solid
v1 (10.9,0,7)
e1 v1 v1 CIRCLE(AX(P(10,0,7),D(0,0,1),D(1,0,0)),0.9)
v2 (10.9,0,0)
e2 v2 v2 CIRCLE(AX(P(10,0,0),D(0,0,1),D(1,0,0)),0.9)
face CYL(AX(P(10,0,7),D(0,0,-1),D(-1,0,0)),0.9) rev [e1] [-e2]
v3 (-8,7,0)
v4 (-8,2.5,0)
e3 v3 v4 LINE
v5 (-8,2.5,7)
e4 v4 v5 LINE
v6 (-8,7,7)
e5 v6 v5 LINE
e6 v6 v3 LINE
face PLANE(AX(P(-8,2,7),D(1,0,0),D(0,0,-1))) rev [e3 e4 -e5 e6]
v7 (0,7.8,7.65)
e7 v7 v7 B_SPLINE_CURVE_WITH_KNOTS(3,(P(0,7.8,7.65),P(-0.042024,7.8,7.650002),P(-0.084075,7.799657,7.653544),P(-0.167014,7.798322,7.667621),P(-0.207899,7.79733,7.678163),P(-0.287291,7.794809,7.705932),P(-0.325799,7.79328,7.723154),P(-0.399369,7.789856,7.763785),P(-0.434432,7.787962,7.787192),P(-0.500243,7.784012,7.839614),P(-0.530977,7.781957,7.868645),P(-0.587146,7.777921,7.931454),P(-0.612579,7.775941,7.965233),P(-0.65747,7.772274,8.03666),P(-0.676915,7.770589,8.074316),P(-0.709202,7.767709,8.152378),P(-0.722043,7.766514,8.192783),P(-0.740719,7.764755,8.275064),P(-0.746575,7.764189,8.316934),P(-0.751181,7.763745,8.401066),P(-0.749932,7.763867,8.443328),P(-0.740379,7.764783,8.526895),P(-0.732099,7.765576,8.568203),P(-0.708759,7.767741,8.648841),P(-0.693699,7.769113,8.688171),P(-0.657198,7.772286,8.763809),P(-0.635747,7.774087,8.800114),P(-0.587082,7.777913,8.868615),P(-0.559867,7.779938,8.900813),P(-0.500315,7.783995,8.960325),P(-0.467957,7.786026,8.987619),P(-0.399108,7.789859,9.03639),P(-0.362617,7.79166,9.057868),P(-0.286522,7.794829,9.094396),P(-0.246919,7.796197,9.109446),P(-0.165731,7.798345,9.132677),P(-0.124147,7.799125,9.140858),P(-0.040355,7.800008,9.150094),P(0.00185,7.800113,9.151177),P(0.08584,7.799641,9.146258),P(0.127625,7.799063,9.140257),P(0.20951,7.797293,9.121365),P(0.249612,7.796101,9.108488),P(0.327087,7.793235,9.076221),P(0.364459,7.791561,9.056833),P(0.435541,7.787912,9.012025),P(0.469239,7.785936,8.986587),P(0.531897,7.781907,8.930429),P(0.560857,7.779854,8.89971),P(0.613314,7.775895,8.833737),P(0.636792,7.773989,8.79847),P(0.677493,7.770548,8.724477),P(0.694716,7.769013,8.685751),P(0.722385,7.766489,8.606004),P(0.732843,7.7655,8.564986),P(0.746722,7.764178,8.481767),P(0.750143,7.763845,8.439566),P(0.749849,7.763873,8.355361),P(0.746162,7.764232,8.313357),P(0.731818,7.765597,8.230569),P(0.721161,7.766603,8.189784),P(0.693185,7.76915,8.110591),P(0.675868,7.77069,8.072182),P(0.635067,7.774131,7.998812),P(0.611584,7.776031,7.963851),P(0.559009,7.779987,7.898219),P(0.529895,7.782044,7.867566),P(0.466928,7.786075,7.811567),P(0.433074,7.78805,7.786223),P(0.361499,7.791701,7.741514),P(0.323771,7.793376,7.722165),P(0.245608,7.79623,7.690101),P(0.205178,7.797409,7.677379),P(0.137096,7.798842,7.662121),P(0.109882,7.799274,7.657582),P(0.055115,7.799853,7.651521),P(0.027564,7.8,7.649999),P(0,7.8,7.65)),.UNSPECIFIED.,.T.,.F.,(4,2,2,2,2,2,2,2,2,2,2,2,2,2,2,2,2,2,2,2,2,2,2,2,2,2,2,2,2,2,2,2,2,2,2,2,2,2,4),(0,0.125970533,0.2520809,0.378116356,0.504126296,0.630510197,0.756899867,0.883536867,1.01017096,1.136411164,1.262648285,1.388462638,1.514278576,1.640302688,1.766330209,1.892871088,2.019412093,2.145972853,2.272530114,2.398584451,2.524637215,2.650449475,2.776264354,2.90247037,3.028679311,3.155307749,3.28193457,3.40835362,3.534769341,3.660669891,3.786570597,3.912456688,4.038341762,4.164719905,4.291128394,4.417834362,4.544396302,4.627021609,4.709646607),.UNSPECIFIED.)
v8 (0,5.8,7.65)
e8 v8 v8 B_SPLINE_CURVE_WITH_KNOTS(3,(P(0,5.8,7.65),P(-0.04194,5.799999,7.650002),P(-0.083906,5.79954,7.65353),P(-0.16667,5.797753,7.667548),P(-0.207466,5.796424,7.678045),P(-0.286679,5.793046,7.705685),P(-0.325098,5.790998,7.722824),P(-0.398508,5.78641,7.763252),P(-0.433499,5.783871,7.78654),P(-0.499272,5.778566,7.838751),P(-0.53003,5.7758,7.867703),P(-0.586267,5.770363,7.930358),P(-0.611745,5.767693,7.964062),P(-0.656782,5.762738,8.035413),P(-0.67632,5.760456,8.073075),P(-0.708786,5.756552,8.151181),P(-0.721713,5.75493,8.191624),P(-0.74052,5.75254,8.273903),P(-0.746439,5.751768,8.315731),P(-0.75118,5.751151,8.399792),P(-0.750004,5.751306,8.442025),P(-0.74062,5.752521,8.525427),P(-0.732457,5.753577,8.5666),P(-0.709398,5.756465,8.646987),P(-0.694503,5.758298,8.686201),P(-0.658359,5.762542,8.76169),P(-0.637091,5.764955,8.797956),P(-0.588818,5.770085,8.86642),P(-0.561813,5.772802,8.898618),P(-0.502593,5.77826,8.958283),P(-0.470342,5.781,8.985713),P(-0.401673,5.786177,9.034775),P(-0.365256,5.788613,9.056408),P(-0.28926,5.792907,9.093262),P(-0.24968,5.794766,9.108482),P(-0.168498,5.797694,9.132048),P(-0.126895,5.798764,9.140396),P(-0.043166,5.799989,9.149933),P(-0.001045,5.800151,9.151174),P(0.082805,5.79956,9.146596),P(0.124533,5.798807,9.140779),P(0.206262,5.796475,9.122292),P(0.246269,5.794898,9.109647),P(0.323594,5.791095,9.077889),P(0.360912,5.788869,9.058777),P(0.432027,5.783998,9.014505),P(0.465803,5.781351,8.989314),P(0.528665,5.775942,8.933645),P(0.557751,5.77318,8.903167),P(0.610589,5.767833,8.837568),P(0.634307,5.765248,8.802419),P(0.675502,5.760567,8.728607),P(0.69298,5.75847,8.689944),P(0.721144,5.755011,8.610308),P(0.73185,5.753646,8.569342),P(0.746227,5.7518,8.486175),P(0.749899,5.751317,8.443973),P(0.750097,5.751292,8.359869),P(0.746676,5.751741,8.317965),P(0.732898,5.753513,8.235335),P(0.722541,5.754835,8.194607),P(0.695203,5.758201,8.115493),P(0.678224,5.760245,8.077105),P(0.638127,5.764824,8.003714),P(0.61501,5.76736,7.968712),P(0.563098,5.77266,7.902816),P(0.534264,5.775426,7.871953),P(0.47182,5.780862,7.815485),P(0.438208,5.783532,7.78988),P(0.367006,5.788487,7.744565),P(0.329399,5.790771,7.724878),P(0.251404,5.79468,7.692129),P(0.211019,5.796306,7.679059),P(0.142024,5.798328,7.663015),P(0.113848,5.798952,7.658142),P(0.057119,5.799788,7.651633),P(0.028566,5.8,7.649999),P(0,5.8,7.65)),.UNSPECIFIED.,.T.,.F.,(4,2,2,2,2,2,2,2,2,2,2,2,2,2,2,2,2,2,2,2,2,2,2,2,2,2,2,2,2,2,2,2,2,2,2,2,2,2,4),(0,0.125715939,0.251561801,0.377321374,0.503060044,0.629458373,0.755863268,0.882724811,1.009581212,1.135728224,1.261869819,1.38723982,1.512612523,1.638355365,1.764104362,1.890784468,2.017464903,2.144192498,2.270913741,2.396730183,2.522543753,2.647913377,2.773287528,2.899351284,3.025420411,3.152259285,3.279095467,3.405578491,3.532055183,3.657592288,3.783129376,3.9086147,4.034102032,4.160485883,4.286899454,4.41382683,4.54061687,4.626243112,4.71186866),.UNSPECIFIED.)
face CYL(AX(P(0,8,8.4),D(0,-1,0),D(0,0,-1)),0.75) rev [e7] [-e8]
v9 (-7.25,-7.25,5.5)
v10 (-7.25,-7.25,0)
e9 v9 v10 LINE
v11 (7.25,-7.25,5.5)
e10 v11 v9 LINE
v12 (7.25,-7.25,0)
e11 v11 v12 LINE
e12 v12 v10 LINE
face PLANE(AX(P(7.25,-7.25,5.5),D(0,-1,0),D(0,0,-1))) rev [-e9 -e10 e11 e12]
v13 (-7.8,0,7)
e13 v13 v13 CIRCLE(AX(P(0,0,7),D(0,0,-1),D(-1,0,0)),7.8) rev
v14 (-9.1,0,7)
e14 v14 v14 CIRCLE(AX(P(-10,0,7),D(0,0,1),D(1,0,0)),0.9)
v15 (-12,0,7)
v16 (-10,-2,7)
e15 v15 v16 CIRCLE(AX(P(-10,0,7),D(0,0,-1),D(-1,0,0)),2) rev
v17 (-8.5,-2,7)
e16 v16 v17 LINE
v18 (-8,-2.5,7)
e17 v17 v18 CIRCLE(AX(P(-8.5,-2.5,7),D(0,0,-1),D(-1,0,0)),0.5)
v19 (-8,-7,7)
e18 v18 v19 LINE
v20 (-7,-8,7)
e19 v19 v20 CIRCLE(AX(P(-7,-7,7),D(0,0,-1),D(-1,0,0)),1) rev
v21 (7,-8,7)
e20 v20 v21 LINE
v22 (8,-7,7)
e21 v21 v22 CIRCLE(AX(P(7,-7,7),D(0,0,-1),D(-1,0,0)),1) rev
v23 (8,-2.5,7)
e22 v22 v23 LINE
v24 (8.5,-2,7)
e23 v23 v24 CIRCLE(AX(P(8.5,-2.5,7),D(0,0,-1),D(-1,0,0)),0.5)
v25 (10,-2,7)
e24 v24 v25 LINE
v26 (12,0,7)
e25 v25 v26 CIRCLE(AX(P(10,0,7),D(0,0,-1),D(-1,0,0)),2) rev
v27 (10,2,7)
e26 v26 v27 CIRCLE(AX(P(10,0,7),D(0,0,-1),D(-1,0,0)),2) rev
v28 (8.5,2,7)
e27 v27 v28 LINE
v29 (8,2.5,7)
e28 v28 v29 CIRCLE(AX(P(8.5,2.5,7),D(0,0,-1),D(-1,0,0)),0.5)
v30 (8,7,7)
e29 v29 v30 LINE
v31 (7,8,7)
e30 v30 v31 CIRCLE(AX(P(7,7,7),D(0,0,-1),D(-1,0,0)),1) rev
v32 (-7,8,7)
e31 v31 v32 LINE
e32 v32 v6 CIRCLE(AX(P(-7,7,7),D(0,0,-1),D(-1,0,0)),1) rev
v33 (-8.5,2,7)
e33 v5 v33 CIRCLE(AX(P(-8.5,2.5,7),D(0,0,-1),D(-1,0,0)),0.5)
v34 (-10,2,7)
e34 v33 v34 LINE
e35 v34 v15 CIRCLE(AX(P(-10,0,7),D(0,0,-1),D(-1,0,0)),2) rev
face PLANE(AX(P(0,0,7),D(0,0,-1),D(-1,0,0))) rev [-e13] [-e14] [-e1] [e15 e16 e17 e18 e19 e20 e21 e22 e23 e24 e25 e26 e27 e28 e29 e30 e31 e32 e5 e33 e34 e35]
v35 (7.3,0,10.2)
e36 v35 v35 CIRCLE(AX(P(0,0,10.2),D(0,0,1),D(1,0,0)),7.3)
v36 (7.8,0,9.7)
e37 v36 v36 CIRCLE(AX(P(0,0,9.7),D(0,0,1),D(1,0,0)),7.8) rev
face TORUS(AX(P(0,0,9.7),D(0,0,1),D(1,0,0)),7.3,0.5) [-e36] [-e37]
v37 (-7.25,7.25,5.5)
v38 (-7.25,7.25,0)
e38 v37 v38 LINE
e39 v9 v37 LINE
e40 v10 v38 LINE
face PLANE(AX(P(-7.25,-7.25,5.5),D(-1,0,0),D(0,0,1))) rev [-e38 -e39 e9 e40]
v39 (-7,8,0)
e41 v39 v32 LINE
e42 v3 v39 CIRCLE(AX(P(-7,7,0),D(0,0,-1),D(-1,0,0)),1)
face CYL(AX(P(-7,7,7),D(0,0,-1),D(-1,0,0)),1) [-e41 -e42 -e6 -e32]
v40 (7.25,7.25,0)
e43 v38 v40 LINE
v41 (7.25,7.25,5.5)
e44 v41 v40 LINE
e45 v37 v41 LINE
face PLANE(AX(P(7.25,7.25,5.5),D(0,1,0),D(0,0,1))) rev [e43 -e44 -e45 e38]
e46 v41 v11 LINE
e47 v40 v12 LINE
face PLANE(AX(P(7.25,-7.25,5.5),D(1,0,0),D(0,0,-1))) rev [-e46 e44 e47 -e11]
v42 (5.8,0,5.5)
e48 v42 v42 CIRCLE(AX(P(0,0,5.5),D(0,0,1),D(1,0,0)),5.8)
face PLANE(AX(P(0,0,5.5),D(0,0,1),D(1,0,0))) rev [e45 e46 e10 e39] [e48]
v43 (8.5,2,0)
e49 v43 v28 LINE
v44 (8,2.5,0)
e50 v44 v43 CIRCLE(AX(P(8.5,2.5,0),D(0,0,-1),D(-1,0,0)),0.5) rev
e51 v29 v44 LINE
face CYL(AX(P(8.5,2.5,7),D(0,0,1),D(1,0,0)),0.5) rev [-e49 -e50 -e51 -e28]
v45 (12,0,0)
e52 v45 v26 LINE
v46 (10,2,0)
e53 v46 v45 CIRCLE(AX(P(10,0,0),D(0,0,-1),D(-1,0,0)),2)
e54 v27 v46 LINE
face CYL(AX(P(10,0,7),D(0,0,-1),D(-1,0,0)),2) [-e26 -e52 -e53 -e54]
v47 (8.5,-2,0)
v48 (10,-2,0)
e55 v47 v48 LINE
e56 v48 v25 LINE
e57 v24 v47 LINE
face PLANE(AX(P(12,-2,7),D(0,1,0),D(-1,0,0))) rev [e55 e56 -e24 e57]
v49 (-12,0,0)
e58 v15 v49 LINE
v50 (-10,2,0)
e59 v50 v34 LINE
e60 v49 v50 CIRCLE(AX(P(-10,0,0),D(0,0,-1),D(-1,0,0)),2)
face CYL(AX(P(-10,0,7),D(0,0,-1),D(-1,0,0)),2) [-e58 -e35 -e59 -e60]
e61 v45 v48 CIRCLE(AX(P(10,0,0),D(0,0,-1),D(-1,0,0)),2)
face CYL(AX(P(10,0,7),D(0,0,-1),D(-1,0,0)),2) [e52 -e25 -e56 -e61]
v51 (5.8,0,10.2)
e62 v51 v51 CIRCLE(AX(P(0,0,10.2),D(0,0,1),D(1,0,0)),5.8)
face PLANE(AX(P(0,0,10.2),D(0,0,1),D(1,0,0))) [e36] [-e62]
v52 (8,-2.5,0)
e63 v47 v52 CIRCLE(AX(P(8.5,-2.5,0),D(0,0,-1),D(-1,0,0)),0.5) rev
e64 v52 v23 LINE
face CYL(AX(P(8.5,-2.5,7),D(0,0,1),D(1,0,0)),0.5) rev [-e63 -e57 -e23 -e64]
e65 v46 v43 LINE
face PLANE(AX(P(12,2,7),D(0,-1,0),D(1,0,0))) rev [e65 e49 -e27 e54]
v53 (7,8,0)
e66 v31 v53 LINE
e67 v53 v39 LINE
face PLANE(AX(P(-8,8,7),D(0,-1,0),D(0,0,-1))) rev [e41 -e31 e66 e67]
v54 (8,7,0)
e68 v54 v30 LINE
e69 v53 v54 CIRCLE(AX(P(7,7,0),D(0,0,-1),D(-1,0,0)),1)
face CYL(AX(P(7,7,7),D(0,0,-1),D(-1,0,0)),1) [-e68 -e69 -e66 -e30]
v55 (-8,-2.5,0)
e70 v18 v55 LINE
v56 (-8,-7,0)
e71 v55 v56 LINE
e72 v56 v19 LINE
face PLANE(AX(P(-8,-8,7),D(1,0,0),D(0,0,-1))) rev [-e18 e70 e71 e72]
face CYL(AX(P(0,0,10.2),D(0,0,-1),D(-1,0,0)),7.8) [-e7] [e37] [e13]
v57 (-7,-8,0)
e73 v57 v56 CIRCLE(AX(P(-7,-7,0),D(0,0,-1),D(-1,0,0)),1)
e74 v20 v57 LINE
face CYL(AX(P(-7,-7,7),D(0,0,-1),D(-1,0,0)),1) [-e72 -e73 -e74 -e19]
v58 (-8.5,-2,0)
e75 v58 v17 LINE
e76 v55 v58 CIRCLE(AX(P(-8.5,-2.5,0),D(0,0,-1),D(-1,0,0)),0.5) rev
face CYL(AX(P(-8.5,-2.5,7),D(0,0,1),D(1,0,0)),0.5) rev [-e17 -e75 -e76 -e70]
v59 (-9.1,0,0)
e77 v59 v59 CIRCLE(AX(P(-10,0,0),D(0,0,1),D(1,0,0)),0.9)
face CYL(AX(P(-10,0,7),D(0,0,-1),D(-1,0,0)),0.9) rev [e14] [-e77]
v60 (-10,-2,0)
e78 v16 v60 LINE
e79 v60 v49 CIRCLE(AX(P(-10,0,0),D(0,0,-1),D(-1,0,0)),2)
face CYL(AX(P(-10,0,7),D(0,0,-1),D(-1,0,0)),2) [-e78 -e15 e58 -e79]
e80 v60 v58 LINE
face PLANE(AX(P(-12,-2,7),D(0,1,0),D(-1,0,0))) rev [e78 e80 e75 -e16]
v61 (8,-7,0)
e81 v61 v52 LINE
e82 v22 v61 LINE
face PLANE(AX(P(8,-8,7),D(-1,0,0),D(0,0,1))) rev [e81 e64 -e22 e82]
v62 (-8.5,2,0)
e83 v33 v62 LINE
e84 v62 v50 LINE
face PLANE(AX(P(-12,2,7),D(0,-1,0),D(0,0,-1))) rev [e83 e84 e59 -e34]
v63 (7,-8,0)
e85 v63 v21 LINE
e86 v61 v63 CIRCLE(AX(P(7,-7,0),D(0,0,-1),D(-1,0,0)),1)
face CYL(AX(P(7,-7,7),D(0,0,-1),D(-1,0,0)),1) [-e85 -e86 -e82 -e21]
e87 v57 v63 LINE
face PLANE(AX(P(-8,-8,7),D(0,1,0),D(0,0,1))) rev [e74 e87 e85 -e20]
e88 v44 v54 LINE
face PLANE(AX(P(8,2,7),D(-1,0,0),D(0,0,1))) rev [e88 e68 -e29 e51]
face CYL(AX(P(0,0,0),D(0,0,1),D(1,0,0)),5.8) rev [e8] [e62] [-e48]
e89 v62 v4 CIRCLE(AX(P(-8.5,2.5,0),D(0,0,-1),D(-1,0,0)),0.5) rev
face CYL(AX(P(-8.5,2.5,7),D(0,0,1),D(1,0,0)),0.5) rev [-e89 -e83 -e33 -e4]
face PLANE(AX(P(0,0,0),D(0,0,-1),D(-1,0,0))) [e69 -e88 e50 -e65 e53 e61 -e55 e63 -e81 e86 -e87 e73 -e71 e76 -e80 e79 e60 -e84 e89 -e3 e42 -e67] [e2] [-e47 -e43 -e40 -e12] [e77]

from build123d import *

# Parameters (mm, degrees)
SKETCH1_R           = 0.9
BOSS_EXTRUDE1_DEPTH = 7
FILLET1_R           = 2
FILLET2_R           = 1
FILLET3_R           = 0.5
SKETCH2_W           = 14.5
SKETCH2_H           = 14.5
CUT_EXTRUDE1_DEPTH  = 5.5
SKETCH3_R           = 7.8
BOSS_EXTRUDE2_DEPTH = 3.2
SKETCH5_R           = 0.75
CUT_EXTRUDE2_DEPTH  = 18.664653973
FILLET4_R           = 0.5
SKETCH6_R           = 5.8
CUT_EXTRUDE3_DEPTH  = 18.664653973


with BuildPart() as part:
    # Sketch1 → Boss-Extrude1 (new body)
    with BuildSketch(Plane.XY):
        Polygon((-8, 2), (-8, 8), (8, 8), (8, 2), (12, 2), (12, -2), (8, -2), (8, -8), (-8, -8), (-8, -2), (-12, -2), (-12, 2), align=None)
        with Locations((10, 0)):
            Circle(SKETCH1_R, mode=Mode.SUBTRACT)
        with Locations((-10, 0)):
            Circle(SKETCH1_R, mode=Mode.SUBTRACT)
    extrude(amount=BOSS_EXTRUDE1_DEPTH)

    # Fillet1
    fillet1_edges = [part.edges().sort_by_distance(p)[0] for p in [
        (-12, -2, 3.5),
        (-12, 2, 3.5),
        (12, -2, 3.5),
        (12, 2, 3.5),
    ]]
    fillet(fillet1_edges, radius=FILLET1_R - 0.0001)  # a hair under: the kernel refuses the full size

    # Fillet2
    fillet2_edges = [part.edges().sort_by_distance(p)[0] for p in [
        (8, -8, 3.5),
        (-8, -8, 3.5),
        (-8, 8, 3.5),
        (8, 8, 3.5),
    ]]
    fillet(fillet2_edges, radius=FILLET2_R)

    # Fillet3
    fillet3_edges = [part.edges().sort_by_distance(p)[0] for p in [
        (8, 2, 3.5),
        (8, -2, 3.5),
        (-8, -2, 3.5),
        (-8, 2, 3.5),
    ]]
    fillet(fillet3_edges, radius=FILLET3_R)

    # Sketch2 → Cut-Extrude1 (cut)
    with BuildSketch(Plane(origin=(0, 0, 0), x_dir=(-1, 0, 0), z_dir=(0, 0, -1))):
        Rectangle(SKETCH2_W, SKETCH2_H)
    extrude(amount=-CUT_EXTRUDE1_DEPTH, mode=Mode.SUBTRACT)

    # Sketch3 → Boss-Extrude2 (add)
    with BuildSketch(Plane.XY.offset(7)):
        with Locations(Location((0, 0, 0), (0, 0, 180))):
            Circle(SKETCH3_R)
    extrude(amount=BOSS_EXTRUDE2_DEPTH)

    # Sketch5 → Cut-Extrude2 (cut, through all)
    with BuildSketch(Plane(origin=(0, 0, 0), x_dir=(1, 0, 0), z_dir=(0, 1, 0))):
        with Locations(Location((0, -8.4, 0), (0, 0, 90))):
            Circle(SKETCH5_R)
    extrude(amount=CUT_EXTRUDE2_DEPTH, mode=Mode.SUBTRACT)

    # Fillet4
    fillet4_edges = [part.edges().sort_by_distance(p)[0] for p in [
        (7.8, 0, 10.2),
    ]]
    fillet(fillet4_edges, radius=FILLET4_R)

    # Sketch6 → Cut-Extrude3 (cut, through all)
    with BuildSketch(Plane.XY.offset(10.2)):
        Circle(SKETCH6_R)
    extrude(amount=-CUT_EXTRUDE3_DEPTH, mode=Mode.SUBTRACT)


solid = part.part
